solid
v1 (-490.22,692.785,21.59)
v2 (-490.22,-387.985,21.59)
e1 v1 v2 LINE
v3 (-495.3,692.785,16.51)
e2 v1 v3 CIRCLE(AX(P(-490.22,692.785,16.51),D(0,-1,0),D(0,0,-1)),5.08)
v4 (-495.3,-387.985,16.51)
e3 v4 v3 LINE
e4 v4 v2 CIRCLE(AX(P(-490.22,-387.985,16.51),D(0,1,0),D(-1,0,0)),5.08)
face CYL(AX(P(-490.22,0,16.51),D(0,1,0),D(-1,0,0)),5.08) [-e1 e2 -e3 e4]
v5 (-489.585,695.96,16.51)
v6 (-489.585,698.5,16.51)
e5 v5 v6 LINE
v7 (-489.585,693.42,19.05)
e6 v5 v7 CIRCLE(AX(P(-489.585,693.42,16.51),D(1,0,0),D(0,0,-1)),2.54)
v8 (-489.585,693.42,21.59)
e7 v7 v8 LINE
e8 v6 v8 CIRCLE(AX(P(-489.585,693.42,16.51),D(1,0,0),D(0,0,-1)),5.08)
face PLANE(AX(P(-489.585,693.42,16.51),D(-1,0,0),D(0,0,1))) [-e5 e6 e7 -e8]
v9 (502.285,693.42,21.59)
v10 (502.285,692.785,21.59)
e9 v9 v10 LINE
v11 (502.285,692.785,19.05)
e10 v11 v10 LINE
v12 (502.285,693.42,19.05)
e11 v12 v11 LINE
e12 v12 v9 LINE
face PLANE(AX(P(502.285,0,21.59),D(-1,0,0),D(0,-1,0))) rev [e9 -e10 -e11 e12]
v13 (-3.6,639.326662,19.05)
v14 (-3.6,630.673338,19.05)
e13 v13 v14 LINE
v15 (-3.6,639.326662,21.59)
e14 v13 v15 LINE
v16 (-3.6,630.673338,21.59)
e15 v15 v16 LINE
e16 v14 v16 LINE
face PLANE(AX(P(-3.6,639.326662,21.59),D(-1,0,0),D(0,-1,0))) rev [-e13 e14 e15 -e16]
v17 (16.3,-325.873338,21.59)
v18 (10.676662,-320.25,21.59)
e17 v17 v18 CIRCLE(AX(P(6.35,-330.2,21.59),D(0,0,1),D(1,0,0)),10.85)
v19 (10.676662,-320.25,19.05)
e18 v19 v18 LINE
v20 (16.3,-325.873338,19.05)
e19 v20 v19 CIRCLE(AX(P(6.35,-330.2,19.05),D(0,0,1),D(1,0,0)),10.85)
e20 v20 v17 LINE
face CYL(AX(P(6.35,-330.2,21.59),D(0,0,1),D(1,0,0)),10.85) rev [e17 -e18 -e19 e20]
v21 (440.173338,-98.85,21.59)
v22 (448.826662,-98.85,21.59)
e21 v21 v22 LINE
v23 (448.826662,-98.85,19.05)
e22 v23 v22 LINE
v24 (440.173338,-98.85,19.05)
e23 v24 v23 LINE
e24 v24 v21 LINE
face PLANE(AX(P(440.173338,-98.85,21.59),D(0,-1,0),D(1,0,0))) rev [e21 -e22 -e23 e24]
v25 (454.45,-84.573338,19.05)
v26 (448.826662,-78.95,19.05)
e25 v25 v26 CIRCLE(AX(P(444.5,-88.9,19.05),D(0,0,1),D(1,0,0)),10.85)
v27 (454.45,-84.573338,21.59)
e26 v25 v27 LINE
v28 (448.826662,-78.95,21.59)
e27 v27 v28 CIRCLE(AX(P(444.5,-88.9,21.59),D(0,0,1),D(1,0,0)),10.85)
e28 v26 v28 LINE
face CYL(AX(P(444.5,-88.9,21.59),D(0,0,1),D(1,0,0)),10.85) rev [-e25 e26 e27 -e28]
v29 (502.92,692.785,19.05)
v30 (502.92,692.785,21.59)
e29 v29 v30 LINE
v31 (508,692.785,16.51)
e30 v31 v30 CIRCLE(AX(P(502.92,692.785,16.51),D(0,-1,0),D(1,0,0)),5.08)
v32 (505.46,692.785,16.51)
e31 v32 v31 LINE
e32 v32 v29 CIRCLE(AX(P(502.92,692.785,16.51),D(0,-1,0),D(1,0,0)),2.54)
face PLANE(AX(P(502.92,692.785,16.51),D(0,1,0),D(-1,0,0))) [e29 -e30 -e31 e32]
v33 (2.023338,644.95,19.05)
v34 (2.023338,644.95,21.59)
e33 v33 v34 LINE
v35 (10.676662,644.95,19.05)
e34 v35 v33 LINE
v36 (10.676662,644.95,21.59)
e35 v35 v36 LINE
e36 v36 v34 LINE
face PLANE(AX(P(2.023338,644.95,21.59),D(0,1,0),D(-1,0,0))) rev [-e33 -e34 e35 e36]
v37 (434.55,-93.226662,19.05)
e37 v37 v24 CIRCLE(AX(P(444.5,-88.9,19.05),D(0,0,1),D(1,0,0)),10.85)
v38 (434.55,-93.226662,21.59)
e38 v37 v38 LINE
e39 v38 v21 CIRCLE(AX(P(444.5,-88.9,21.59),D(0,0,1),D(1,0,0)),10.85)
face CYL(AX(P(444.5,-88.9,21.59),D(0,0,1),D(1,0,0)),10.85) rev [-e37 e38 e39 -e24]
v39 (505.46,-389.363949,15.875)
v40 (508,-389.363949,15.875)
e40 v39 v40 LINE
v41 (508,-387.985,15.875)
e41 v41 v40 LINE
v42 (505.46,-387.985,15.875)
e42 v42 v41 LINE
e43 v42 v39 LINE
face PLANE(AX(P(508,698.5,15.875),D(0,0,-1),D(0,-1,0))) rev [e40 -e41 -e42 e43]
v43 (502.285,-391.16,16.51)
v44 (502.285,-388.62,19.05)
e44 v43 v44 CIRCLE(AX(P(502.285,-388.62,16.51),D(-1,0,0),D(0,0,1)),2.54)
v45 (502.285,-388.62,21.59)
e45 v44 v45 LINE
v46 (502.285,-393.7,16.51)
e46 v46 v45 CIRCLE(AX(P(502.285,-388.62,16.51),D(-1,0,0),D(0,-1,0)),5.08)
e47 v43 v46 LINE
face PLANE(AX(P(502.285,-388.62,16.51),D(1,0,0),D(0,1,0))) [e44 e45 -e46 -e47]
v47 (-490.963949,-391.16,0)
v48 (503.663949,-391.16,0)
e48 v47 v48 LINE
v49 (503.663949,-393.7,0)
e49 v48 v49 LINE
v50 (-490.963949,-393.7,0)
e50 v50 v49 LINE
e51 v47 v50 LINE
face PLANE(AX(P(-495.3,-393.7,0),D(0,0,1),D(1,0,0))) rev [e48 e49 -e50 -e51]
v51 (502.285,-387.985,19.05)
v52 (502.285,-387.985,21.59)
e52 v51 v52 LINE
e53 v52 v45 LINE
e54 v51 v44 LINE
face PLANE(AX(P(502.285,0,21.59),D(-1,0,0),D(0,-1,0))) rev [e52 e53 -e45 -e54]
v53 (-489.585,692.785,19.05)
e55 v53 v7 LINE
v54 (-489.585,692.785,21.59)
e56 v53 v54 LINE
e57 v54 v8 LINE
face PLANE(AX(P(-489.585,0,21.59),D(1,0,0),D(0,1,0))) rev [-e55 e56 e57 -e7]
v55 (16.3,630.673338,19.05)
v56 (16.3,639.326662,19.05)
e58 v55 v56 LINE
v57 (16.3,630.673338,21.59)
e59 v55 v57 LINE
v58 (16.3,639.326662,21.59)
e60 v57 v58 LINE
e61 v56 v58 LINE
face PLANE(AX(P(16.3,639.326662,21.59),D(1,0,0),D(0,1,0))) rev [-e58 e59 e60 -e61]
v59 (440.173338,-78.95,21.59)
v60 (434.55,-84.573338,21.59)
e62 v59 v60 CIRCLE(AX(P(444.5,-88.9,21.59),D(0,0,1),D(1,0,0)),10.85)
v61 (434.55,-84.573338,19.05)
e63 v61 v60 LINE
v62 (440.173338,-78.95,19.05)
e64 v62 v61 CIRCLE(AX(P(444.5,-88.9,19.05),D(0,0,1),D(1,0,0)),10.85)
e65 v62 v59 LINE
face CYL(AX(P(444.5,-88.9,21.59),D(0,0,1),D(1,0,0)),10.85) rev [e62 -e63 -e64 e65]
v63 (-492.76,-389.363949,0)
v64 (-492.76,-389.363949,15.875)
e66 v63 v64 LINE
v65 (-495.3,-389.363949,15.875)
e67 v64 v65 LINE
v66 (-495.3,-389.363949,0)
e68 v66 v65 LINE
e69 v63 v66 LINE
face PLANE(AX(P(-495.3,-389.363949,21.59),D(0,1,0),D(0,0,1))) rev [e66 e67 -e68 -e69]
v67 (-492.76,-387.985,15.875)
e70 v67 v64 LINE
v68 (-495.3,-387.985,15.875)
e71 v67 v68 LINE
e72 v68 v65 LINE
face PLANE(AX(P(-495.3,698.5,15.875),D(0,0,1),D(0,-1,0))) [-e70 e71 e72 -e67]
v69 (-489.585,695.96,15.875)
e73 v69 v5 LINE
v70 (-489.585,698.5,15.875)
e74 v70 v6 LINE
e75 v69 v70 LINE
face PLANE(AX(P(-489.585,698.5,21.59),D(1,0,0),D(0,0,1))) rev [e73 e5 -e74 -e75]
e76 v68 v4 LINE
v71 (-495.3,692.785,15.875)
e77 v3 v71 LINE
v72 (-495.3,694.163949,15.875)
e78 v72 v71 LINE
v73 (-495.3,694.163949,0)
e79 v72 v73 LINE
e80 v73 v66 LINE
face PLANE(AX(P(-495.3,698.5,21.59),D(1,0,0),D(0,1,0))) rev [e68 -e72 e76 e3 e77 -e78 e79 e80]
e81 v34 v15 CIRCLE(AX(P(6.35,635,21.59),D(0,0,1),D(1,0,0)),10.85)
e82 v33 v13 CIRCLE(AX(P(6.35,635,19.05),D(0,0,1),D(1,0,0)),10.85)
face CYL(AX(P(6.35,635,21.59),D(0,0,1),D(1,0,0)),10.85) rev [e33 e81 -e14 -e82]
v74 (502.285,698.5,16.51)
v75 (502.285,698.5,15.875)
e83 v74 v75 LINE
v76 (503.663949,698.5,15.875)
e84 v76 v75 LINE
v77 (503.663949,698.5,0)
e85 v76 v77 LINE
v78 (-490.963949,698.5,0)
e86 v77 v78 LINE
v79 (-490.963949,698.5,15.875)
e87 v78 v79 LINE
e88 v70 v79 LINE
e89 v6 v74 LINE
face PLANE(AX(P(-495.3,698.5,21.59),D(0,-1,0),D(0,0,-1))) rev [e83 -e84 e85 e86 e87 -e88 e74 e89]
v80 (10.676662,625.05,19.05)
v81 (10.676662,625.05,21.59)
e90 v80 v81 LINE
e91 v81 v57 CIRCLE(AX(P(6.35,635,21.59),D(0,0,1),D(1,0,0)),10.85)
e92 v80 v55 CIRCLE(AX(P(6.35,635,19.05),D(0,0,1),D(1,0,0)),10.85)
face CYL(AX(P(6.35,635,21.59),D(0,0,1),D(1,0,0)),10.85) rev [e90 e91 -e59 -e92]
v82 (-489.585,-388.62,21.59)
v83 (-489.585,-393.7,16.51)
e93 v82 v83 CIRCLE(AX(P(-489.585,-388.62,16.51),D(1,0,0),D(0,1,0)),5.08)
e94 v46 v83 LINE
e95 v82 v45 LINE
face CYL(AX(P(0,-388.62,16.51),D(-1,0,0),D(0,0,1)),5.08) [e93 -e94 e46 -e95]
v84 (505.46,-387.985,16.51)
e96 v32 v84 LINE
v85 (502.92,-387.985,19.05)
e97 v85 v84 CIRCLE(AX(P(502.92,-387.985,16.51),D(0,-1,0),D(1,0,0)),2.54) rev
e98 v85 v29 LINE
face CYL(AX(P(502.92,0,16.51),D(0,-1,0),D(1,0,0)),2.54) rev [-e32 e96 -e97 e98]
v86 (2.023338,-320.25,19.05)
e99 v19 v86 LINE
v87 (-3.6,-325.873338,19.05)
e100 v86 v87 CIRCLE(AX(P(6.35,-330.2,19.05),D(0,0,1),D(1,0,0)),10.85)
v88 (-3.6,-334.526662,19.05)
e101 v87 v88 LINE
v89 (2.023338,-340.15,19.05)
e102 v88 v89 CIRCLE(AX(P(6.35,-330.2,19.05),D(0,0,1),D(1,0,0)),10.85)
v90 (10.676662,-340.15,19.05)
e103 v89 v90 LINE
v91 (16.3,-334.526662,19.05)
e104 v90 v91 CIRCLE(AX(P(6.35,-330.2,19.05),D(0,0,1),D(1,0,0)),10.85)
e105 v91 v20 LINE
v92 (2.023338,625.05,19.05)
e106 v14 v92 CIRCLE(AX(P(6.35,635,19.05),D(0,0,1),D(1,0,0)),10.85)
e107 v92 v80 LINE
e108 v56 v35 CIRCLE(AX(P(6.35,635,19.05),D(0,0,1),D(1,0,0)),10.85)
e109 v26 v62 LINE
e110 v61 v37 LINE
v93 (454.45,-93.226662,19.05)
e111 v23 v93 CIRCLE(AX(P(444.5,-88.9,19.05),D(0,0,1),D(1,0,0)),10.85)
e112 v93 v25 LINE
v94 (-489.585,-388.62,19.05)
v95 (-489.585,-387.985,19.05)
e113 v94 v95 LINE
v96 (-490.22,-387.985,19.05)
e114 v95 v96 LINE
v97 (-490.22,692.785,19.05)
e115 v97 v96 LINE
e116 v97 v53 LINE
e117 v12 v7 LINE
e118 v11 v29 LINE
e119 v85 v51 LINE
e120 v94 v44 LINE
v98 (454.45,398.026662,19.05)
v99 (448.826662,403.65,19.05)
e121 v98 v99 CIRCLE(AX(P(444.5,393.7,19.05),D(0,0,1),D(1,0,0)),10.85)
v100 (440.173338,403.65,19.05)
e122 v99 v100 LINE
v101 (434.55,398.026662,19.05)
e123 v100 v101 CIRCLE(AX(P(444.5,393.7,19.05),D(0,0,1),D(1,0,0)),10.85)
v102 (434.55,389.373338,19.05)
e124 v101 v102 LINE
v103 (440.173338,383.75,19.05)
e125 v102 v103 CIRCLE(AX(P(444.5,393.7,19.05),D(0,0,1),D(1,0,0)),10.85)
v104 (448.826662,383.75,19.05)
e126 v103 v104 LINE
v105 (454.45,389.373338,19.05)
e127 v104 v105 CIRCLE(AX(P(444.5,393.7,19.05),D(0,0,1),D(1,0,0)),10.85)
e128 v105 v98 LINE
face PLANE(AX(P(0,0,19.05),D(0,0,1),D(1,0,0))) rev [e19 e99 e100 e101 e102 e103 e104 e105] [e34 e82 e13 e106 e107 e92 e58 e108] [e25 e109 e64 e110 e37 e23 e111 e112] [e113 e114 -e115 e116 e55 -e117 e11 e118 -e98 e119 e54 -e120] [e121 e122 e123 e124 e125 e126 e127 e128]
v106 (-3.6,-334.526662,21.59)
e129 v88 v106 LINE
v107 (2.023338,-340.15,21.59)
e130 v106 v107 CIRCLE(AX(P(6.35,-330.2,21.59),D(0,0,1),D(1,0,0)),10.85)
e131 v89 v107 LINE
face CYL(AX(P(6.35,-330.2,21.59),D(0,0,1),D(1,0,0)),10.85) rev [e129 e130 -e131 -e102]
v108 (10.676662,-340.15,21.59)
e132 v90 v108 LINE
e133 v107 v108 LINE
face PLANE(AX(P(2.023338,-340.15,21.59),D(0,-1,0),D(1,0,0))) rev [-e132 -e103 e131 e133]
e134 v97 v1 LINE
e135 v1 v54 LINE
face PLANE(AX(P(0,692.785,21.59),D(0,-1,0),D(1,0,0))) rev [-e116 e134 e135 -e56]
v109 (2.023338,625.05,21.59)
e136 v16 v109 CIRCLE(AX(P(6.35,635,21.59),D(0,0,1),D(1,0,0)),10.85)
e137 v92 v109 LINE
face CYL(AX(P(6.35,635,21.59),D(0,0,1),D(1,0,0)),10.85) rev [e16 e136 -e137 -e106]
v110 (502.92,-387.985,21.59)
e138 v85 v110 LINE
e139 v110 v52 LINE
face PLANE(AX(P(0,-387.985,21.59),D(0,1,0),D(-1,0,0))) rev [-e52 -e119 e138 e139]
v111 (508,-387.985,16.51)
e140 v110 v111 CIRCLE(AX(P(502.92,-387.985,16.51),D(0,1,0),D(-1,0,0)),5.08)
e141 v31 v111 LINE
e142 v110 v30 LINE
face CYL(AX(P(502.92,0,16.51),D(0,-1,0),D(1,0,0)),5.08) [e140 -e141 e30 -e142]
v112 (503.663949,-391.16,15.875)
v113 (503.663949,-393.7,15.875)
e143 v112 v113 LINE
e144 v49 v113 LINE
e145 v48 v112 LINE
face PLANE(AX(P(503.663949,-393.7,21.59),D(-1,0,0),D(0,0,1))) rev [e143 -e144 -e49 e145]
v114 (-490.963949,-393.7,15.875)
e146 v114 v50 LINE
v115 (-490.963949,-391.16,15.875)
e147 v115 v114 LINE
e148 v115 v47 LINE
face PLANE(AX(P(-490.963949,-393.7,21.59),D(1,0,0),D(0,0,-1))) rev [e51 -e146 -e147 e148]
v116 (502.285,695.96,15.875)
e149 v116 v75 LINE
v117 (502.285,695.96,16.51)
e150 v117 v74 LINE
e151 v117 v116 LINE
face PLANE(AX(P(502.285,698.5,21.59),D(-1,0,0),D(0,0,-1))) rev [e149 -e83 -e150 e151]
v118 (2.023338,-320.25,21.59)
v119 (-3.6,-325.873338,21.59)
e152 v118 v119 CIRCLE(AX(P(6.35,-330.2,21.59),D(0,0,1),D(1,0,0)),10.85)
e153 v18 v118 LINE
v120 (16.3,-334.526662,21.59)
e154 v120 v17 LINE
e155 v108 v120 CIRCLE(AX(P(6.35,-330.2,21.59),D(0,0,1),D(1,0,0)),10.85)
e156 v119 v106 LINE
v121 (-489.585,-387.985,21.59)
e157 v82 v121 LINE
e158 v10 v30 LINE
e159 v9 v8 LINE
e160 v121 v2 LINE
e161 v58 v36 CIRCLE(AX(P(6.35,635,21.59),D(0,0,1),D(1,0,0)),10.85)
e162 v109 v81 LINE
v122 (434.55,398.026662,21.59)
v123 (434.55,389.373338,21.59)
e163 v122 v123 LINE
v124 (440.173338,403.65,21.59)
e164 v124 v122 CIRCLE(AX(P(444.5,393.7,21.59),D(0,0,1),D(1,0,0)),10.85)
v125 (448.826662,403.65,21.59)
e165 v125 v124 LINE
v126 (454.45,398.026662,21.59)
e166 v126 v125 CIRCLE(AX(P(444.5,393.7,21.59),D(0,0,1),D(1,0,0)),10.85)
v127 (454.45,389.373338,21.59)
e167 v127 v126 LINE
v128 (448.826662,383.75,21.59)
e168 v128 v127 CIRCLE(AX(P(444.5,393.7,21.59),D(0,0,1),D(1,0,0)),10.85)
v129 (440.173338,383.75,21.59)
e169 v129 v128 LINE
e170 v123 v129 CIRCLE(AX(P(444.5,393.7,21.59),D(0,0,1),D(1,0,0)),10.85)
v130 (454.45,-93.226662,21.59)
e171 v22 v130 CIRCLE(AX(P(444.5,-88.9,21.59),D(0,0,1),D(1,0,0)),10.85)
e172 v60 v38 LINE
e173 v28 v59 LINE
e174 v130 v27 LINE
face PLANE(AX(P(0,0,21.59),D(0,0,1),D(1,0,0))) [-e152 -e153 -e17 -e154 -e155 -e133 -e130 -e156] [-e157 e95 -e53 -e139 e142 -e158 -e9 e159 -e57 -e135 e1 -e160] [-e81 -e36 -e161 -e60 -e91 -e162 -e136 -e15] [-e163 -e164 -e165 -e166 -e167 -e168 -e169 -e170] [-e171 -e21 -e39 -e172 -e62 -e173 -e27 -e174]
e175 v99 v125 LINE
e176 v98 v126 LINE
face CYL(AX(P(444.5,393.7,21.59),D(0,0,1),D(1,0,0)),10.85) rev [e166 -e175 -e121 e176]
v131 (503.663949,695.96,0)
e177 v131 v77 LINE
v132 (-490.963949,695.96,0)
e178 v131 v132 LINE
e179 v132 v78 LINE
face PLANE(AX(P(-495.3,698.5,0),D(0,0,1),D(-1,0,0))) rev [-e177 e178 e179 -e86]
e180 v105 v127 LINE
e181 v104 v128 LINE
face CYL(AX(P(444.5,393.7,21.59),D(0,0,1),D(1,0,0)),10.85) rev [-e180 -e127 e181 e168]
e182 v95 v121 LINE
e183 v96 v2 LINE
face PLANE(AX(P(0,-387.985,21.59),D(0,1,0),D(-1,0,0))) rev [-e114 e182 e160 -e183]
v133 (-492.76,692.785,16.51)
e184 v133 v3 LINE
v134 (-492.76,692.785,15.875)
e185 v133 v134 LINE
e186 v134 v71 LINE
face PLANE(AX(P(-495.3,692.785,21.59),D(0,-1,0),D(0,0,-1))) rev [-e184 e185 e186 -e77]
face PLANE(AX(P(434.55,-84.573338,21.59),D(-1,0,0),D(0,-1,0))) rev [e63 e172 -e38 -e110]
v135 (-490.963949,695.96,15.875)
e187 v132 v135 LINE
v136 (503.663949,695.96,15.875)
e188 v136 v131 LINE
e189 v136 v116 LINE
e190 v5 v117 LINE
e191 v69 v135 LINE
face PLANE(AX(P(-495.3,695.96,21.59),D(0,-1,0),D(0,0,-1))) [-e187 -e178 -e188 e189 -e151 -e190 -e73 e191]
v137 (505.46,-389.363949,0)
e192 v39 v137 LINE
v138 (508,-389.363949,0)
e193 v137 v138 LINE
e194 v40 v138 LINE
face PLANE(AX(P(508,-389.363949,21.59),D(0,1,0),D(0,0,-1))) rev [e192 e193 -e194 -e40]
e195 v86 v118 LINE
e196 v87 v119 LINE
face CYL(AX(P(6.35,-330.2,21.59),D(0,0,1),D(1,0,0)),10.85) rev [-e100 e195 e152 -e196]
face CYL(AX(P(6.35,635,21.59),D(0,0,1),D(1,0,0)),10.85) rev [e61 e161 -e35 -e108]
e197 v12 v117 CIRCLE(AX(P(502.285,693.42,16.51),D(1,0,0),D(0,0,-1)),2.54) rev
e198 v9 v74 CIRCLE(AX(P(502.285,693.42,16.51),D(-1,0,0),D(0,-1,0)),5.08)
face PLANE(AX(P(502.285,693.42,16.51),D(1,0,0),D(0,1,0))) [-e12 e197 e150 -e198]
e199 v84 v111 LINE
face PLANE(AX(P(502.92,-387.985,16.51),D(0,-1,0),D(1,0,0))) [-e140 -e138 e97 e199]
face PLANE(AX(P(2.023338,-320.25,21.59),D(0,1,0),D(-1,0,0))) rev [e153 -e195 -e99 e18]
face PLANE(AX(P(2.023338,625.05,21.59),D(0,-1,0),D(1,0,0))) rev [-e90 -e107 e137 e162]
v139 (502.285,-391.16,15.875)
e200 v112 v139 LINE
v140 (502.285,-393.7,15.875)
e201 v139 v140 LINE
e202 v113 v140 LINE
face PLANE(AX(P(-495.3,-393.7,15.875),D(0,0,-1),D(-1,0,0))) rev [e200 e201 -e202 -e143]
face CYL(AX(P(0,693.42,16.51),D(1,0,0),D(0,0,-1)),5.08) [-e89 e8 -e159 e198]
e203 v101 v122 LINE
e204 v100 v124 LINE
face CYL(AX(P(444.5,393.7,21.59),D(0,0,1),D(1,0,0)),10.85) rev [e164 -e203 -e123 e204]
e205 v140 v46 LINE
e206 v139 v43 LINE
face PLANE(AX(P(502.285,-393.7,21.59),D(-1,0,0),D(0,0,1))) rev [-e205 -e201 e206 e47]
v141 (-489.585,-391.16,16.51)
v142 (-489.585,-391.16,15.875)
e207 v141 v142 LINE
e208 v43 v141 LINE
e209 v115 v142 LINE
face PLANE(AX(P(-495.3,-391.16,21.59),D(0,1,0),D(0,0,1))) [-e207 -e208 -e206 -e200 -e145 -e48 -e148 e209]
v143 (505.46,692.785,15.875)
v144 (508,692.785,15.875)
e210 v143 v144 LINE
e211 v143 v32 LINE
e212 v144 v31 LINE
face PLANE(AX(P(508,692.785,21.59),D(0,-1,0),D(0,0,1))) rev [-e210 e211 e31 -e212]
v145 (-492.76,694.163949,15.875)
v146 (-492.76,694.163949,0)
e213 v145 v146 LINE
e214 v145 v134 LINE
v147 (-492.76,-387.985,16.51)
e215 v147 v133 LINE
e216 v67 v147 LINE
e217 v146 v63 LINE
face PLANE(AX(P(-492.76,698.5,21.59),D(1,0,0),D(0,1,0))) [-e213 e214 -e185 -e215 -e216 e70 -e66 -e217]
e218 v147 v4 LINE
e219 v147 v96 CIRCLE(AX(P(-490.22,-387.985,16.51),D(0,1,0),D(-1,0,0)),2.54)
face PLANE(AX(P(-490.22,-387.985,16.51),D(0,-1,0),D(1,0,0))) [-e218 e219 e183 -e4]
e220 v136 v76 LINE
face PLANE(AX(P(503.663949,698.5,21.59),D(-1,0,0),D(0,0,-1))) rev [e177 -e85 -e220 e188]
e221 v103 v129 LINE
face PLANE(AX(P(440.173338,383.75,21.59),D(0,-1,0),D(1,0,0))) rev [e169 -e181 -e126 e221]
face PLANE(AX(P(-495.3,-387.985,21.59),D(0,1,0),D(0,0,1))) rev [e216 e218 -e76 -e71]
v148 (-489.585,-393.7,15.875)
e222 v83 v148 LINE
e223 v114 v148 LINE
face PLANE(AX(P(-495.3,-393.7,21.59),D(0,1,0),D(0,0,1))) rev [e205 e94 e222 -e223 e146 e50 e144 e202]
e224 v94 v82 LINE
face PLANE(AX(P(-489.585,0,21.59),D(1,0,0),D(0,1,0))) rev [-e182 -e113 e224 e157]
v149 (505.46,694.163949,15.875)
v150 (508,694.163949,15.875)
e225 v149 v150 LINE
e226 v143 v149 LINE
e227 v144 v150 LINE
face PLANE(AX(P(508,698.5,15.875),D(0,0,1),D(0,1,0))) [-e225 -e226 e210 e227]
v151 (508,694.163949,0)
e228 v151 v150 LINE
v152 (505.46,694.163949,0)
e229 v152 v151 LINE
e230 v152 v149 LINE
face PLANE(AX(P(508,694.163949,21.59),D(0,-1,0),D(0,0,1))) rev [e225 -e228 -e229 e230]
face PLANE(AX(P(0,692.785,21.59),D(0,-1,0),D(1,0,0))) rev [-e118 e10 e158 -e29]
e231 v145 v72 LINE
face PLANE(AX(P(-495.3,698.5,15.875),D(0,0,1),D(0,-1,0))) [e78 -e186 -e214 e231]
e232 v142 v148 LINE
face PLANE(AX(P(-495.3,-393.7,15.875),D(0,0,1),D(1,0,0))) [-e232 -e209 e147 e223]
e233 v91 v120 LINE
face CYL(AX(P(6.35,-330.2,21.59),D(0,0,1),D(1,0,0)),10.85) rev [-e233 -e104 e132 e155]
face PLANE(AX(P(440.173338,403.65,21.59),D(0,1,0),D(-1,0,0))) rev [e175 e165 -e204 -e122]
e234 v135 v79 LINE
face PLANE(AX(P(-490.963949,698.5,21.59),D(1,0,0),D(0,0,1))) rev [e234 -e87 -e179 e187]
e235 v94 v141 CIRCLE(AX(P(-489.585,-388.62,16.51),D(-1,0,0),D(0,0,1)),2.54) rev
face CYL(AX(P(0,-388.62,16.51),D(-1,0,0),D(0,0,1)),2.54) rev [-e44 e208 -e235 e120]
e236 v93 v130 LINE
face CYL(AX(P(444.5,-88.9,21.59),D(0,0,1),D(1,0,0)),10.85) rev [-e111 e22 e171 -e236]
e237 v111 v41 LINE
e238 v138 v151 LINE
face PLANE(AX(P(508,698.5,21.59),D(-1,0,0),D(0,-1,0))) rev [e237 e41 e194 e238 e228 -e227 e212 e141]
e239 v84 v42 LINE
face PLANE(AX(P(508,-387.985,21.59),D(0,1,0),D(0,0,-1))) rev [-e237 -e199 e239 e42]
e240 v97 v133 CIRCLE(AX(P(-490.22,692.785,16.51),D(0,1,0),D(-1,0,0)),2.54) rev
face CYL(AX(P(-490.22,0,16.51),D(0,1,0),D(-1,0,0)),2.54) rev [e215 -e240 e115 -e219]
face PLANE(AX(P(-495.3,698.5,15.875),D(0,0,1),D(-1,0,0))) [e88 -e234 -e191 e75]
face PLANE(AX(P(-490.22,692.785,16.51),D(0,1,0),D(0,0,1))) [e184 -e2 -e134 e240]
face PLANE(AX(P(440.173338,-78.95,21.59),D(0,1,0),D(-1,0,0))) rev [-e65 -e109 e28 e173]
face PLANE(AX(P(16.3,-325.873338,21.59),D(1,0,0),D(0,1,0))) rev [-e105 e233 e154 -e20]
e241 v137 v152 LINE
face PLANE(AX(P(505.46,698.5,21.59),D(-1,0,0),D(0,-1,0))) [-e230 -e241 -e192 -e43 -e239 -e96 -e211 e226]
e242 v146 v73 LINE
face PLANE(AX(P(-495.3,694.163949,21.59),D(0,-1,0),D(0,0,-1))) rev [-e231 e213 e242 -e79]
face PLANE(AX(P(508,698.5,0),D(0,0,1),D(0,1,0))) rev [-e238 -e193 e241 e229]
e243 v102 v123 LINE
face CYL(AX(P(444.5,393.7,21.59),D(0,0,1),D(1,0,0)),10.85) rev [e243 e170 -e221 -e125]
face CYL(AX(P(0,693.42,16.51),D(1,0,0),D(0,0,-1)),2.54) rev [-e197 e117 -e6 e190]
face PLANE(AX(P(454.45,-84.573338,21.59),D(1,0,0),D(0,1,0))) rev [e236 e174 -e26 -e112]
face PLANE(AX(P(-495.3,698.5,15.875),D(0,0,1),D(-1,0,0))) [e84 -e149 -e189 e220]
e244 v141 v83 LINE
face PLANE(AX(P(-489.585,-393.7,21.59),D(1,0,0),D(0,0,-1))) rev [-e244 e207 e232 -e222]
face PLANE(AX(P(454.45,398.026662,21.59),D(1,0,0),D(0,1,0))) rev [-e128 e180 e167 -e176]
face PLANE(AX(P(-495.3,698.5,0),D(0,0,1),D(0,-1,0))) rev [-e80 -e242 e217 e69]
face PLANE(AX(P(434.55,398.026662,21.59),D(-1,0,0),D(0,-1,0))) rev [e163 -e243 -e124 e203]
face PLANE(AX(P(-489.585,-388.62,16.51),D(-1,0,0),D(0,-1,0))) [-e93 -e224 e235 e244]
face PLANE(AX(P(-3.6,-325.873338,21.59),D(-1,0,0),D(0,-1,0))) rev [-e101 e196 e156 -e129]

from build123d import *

# Parameters (mm, degrees)
SKETCH1_W               = 1003.3
SKETCH1_H               = 1092.2
SKETCH1_W_2             = 998.22
SKETCH1_H_2             = 1087.12
BOSS_EXTRUDE1_DEPTH     = 21.59
SKETCH3_W               = 1003.3
SKETCH3_H               = 1092.2
BOSS_EXTRUDE2_DEPTH     = 2.54
CUT_EXTRUDE1_REACH      = 865.963
CONVERT_SOLID1_START    = -495.3
CONVERT_SOLID1_DEPTH    = 1003.3
CONVERT_SOLID1_2_DEPTH  = 4.336051224
CONVERT_SOLID1_START_2  = 503.663948776
CONVERT_SOLID1_3_DEPTH  = 4.336051224
CONVERT_SOLID1_START_3  = -490.963948776
CONVERT_SOLID1_4_DEPTH  = 1.378948776
CONVERT_SOLID1_START_4  = 502.285
CONVERT_SOLID1_5_DEPTH  = 1.378948776
CONVERT_SOLID1_START_5  = -489.585
CONVERT_SOLID1_6_DEPTH  = 991.87
CONVERT_SOLID1_START_6  = -391.16
CONVERT_SOLID1_7_DEPTH  = 1087.12
CONVERT_SOLID1_8_DEPTH  = 1.796051224
CONVERT_SOLID1_START_7  = 694.163948776
CONVERT_SOLID1_9_DEPTH  = 1.796051224
CONVERT_SOLID1_START_8  = -389.363948776
CONVERT_SOLID1_10_DEPTH = 1.378948776
CONVERT_SOLID1_START_9  = 692.785
CONVERT_SOLID1_11_DEPTH = 1.378948776
CONVERT_SOLID1_START_10 = -387.985
CONVERT_SOLID1_12_DEPTH = 1080.77


with BuildPart() as part:
    # Sketch1 → Boss-Extrude1 (new body)
    with BuildSketch(Plane.XY):
        with Locations((6.35, 152.4)):
            Rectangle(SKETCH1_W, SKETCH1_H)
        with Locations((6.35, 152.4)):
            Rectangle(SKETCH1_W_2, SKETCH1_H_2, mode=Mode.SUBTRACT)
    extrude(amount=BOSS_EXTRUDE1_DEPTH)

    # Sketch3 → Boss-Extrude2 (add)
    with BuildSketch(Plane.XY.offset(21.59)):
        with Locations((6.35, 152.4)):
            Rectangle(SKETCH3_W, SKETCH3_H)
    extrude(amount=-BOSS_EXTRUDE2_DEPTH)

    # Sketch4 → Cut-Extrude1 (cut, up to next)
    with BuildSketch(Plane.XY.offset(21.59), mode=Mode.PRIVATE) as cut_extrude1_sk1:
        with BuildLine():
            Line((440.173338469, 403.65), (448.826661531, 403.65))
            ThreePointArc((448.826661531, 403.65), (452.172108576, 401.372108576), (454.45, 398.026661531))
            Line((454.45, 398.026661531), (454.45, 389.373338469))
            ThreePointArc((454.45, 389.373338469), (452.172108576, 386.027891424), (448.826661531, 383.75))
            Line((448.826661531, 383.75), (440.173338469, 383.75))
            ThreePointArc((440.173338469, 383.75), (436.827891424, 386.027891424), (434.55, 389.373338469))
            Line((434.55, 389.373338469), (434.55, 398.026661531))
            ThreePointArc((434.55, 398.026661531), (436.827891424, 401.372108576), (440.173338469, 403.65))
        make_face()
    cut_extrude1_tool1 = extrude(cut_extrude1_sk1.sketch, amount=-CUT_EXTRUDE1_REACH, mode=Mode.PRIVATE) & part.part
    # Sketch4 → Cut-Extrude1 (cut, up to next)
    with BuildSketch(Plane.XY.offset(21.59), mode=Mode.PRIVATE) as cut_extrude1_sk2:
        with BuildLine():
            Line((440.173338469, -78.95), (448.826661531, -78.95))
            ThreePointArc((448.826661531, -78.95), (452.172108576, -81.227891424), (454.45, -84.573338469))
            Line((454.45, -84.573338469), (454.45, -93.226661531))
            ThreePointArc((454.45, -93.226661531), (452.172108576, -96.572108576), (448.826661531, -98.85))
            Line((448.826661531, -98.85), (440.173338469, -98.85))
            ThreePointArc((440.173338469, -98.85), (436.827891424, -96.572108576), (434.55, -93.226661531))
            Line((434.55, -93.226661531), (434.55, -84.573338469))
            ThreePointArc((434.55, -84.573338469), (436.827891424, -81.227891424), (440.173338469, -78.95))
        make_face()
    cut_extrude1_tool2 = extrude(cut_extrude1_sk2.sketch, amount=-CUT_EXTRUDE1_REACH, mode=Mode.PRIVATE) & part.part
    # Sketch4 → Cut-Extrude1 (cut, up to next)
    with BuildSketch(Plane.XY.offset(21.59), mode=Mode.PRIVATE) as cut_extrude1_sk3:
        with BuildLine():
            Line((2.023338469, 644.95), (10.676661531, 644.95))
            ThreePointArc((10.676661531, 644.95), (14.022108576, 642.672108576), (16.3, 639.326661531))
            Line((16.3, 639.326661531), (16.3, 630.673338469))
            ThreePointArc((16.3, 630.673338469), (14.022108576, 627.327891424), (10.676661531, 625.05))
            Line((10.676661531, 625.05), (2.023338469, 625.05))
            ThreePointArc((2.023338469, 625.05), (-1.322108576, 627.327891424), (-3.6, 630.673338469))
            Line((-3.6, 630.673338469), (-3.6, 639.326661531))
            ThreePointArc((-3.6, 639.326661531), (-1.322108576, 642.672108576), (2.023338469, 644.95))
        make_face()
    cut_extrude1_tool3 = extrude(cut_extrude1_sk3.sketch, amount=-CUT_EXTRUDE1_REACH, mode=Mode.PRIVATE) & part.part
    # Sketch4 → Cut-Extrude1 (cut, up to next)
    with BuildSketch(Plane.XY.offset(21.59), mode=Mode.PRIVATE) as cut_extrude1_sk4:
        with BuildLine():
            Line((2.023338469, -320.25), (10.676661531, -320.25))
            ThreePointArc((10.676661531, -320.25), (14.022108576, -322.527891424), (16.3, -325.873338469))
            Line((16.3, -325.873338469), (16.3, -334.526661531))
            ThreePointArc((16.3, -334.526661531), (14.022108576, -337.872108576), (10.676661531, -340.15))
            Line((10.676661531, -340.15), (2.023338469, -340.15))
            ThreePointArc((2.023338469, -340.15), (-1.322108576, -337.872108576), (-3.6, -334.526661531))
            Line((-3.6, -334.526661531), (-3.6, -325.873338469))
            ThreePointArc((-3.6, -325.873338469), (-1.322108576, -322.527891424), (2.023338469, -320.25))
        make_face()
    cut_extrude1_tool4 = extrude(cut_extrude1_sk4.sketch, amount=-CUT_EXTRUDE1_REACH, mode=Mode.PRIVATE) & part.part
    add(cut_extrude1_tool1.solids().sort_by_distance((444.5, 393.7, 21.59))[0], mode=Mode.SUBTRACT)
    add(cut_extrude1_tool2.solids().sort_by_distance((444.5, -88.9, 21.59))[0], mode=Mode.SUBTRACT)
    add(cut_extrude1_tool3.solids().sort_by_distance((6.35, 635, 21.59))[0], mode=Mode.SUBTRACT)
    add(cut_extrude1_tool4.solids().sort_by_distance((6.35, -330.2, 21.59))[0], mode=Mode.SUBTRACT)

    # Convert-Solid1: read off the stored shape, not the designer's step
    # Convert-Solid1 outline → Convert-Solid1 (cut)
    with BuildSketch(Plane.YZ.offset(CONVERT_SOLID1_START)):
        with BuildLine():
            ThreePointArc((-393.7, 16.51), (-392.212102448, 20.102102448), (-388.62, 21.59))
            Line((-388.62, 21.59), (-393.7, 21.59))
            Line((-393.7, 21.59), (-393.7, 16.51))
        make_face()
        with BuildLine():
            Line((698.5, 21.59), (693.42, 21.59))
            ThreePointArc((693.42, 21.59), (697.012102448, 20.102102448), (698.5, 16.51))
            Line((698.5, 16.51), (698.5, 21.59))
        make_face()
    extrude(amount=CONVERT_SOLID1_DEPTH, mode=Mode.SUBTRACT)

    # Convert-Solid1 2 outline → Convert-Solid1 2 (cut)
    with BuildSketch(Plane.YZ.offset(CONVERT_SOLID1_START)):
        with BuildLine():
            Line((-388.62, 19.05), (-387.985, 19.05))
            Line((-387.985, 19.05), (-387.985, 21.59))
            Line((-387.985, 21.59), (-388.62, 21.59))
            ThreePointArc((-388.62, 21.59), (-392.212102448, 20.102102448), (-393.7, 16.51))
            Line((-393.7, 16.51), (-393.7, 0))
            Line((-393.7, 0), (-391.16, 0))
            Line((-391.16, 0), (-391.16, 16.51))
            ThreePointArc((-391.16, 16.51), (-390.416051224, 18.306051224), (-388.62, 19.05))
        make_face()
        with BuildLine():
            Line((692.785, 21.59), (692.785, 19.05))
            Line((692.785, 19.05), (693.42, 19.05))
            ThreePointArc((693.42, 19.05), (695.216051224, 18.306051224), (695.96, 16.51))
            Line((695.96, 16.51), (695.96, 0))
            Line((695.96, 0), (698.5, 0))
            Line((698.5, 0), (698.5, 16.51))
            ThreePointArc((698.5, 16.51), (697.012102448, 20.102102448), (693.42, 21.59))
            Line((693.42, 21.59), (692.785, 21.59))
        make_face()
    extrude(amount=CONVERT_SOLID1_2_DEPTH, mode=Mode.SUBTRACT)

    # Convert-Solid1 3 outline → Convert-Solid1 3 (cut)
    with BuildSketch(Plane.YZ.offset(CONVERT_SOLID1_START_2)):
        with BuildLine():
            Line((-388.62, 19.05), (-387.985, 19.05))
            Line((-387.985, 19.05), (-387.985, 21.59))
            Line((-387.985, 21.59), (-388.62, 21.59))
            ThreePointArc((-388.62, 21.59), (-392.212102448, 20.102102448), (-393.7, 16.51))
            Line((-393.7, 16.51), (-393.7, 0))
            Line((-393.7, 0), (-391.16, 0))
            Line((-391.16, 0), (-391.16, 16.51))
            ThreePointArc((-391.16, 16.51), (-390.416051224, 18.306051224), (-388.62, 19.05))
        make_face()
        with BuildLine():
            Line((692.785, 21.59), (692.785, 19.05))
            Line((692.785, 19.05), (693.42, 19.05))
            ThreePointArc((693.42, 19.05), (695.216051224, 18.306051224), (695.96, 16.51))
            Line((695.96, 16.51), (695.96, 0))
            Line((695.96, 0), (698.5, 0))
            Line((698.5, 0), (698.5, 16.51))
            ThreePointArc((698.5, 16.51), (697.012102448, 20.102102448), (693.42, 21.59))
            Line((693.42, 21.59), (692.785, 21.59))
        make_face()
    extrude(amount=CONVERT_SOLID1_3_DEPTH, mode=Mode.SUBTRACT)

    # Convert-Solid1 4 outline → Convert-Solid1 4 (cut)
    with BuildSketch(Plane.YZ.offset(CONVERT_SOLID1_START_3)):
        with BuildLine():
            Line((-391.16, 19.05), (-387.985, 19.05))
            Line((-387.985, 19.05), (-387.985, 21.59))
            Line((-387.985, 21.59), (-388.62, 21.59))
            ThreePointArc((-388.62, 21.59), (-392.212102448, 20.102102448), (-393.7, 16.51))
            Line((-393.7, 16.51), (-393.7, 15.875))
            Line((-393.7, 15.875), (-391.16, 15.875))
            Line((-391.16, 15.875), (-391.16, 19.05))
        make_face()
        with BuildLine():
            Line((692.785, 21.59), (692.785, 19.05))
            Line((692.785, 19.05), (695.96, 19.05))
            Line((695.96, 19.05), (695.96, 15.875))
            Line((695.96, 15.875), (698.5, 15.875))
            Line((698.5, 15.875), (698.5, 16.51))
            ThreePointArc((698.5, 16.51), (697.012102448, 20.102102448), (693.42, 21.59))
            Line((693.42, 21.59), (692.785, 21.59))
        make_face()
    extrude(amount=CONVERT_SOLID1_4_DEPTH, mode=Mode.SUBTRACT)

    # Convert-Solid1 5 outline → Convert-Solid1 5 (cut)
    with BuildSketch(Plane.YZ.offset(CONVERT_SOLID1_START_4)):
        with BuildLine():
            Line((-391.16, 19.05), (-387.985, 19.05))
            Line((-387.985, 19.05), (-387.985, 21.59))
            Line((-387.985, 21.59), (-388.62, 21.59))
            ThreePointArc((-388.62, 21.59), (-392.212102448, 20.102102448), (-393.7, 16.51))
            Line((-393.7, 16.51), (-393.7, 15.875))
            Line((-393.7, 15.875), (-391.16, 15.875))
            Line((-391.16, 15.875), (-391.16, 19.05))
        make_face()
        with BuildLine():
            Line((692.785, 21.59), (692.785, 19.05))
            Line((692.785, 19.05), (695.96, 19.05))
            Line((695.96, 19.05), (695.96, 15.875))
            Line((695.96, 15.875), (698.5, 15.875))
            Line((698.5, 15.875), (698.5, 16.51))
            ThreePointArc((698.5, 16.51), (697.012102448, 20.102102448), (693.42, 21.59))
            Line((693.42, 21.59), (692.785, 21.59))
        make_face()
    extrude(amount=CONVERT_SOLID1_5_DEPTH, mode=Mode.SUBTRACT)

    # Convert-Solid1 6 outline → Convert-Solid1 6 (add)
    with BuildSketch(Plane.YZ.offset(CONVERT_SOLID1_START_5)):
        with BuildLine():
            ThreePointArc((-391.16, 16.51), (-390.416051224, 18.306051224), (-388.62, 19.05))
            Line((-388.62, 19.05), (-391.16, 19.05))
            Line((-391.16, 19.05), (-391.16, 16.51))
        make_face()
        with BuildLine():
            Line((695.96, 19.05), (693.42, 19.05))
            ThreePointArc((693.42, 19.05), (695.216051224, 18.306051224), (695.96, 16.51))
            Line((695.96, 16.51), (695.96, 19.05))
        make_face()
    extrude(amount=CONVERT_SOLID1_6_DEPTH)

    # Convert-Solid1 7 outline → Convert-Solid1 7 (cut)
    with BuildSketch(Plane(origin=(0, 0, 0), x_dir=(1, 0, 0), z_dir=(0, 1, 0)).offset(CONVERT_SOLID1_START_6)):
        with BuildLine():
            ThreePointArc((508, -16.51), (506.512102448, -20.102102448), (502.92, -21.59))
            Line((502.92, -21.59), (508, -21.59))
            Line((508, -21.59), (508, -16.51))
        make_face()
        with BuildLine():
            Line((-495.3, -21.59), (-490.22, -21.59))
            ThreePointArc((-490.22, -21.59), (-493.812102448, -20.102102448), (-495.3, -16.51))
            Line((-495.3, -16.51), (-495.3, -21.59))
        make_face()
    extrude(amount=CONVERT_SOLID1_7_DEPTH, mode=Mode.SUBTRACT)

    # Convert-Solid1 8 outline → Convert-Solid1 8 (cut)
    with BuildSketch(Plane(origin=(0, 0, 0), x_dir=(1, 0, 0), z_dir=(0, 1, 0)).offset(CONVERT_SOLID1_START_6)):
        with BuildLine():
            Line((508, -16.51), (508, 0))
            Line((508, 0), (505.46, 0))
            Line((505.46, 0), (505.46, -19.05))
            Line((505.46, -19.05), (507.319409051, -19.05))
            ThreePointArc((507.319409051, -19.05), (507.826903197, -17.824800749), (508, -16.51))
        make_face()
        with BuildLine():
            Line((-492.76, -19.05), (-492.76, 0))
            Line((-492.76, 0), (-495.3, 0))
            Line((-495.3, 0), (-495.3, -16.51))
            ThreePointArc((-495.3, -16.51), (-495.126903197, -17.824800749), (-494.619409051, -19.05))
            Line((-494.619409051, -19.05), (-492.76, -19.05))
        make_face()
    extrude(amount=CONVERT_SOLID1_8_DEPTH, mode=Mode.SUBTRACT)

    # Convert-Solid1 9 outline → Convert-Solid1 9 (cut)
    with BuildSketch(Plane(origin=(0, 0, 0), x_dir=(1, 0, 0), z_dir=(0, 1, 0)).offset(CONVERT_SOLID1_START_7)):
        with BuildLine():
            Line((508, -16.51), (508, 0))
            Line((508, 0), (505.46, 0))
            Line((505.46, 0), (505.46, -19.05))
            Line((505.46, -19.05), (507.319409051, -19.05))
            ThreePointArc((507.319409051, -19.05), (507.826903197, -17.824800749), (508, -16.51))
        make_face()
        with BuildLine():
            Line((-492.76, -19.05), (-492.76, 0))
            Line((-492.76, 0), (-495.3, 0))
            Line((-495.3, 0), (-495.3, -16.51))
            ThreePointArc((-495.3, -16.51), (-495.126903197, -17.824800749), (-494.619409051, -19.05))
            Line((-494.619409051, -19.05), (-492.76, -19.05))
        make_face()
    extrude(amount=CONVERT_SOLID1_9_DEPTH, mode=Mode.SUBTRACT)

    # Convert-Solid1 10 outline → Convert-Solid1 10 (cut)
    with BuildSketch(Plane(origin=(0, 0, 0), x_dir=(1, 0, 0), z_dir=(0, 1, 0)).offset(CONVERT_SOLID1_START_8)):
        with BuildLine():
            Line((508, -16.51), (508, -15.875))
            Line((508, -15.875), (505.46, -15.875))
            Line((505.46, -15.875), (505.46, -19.05))
            Line((505.46, -19.05), (507.319409051, -19.05))
            ThreePointArc((507.319409051, -19.05), (507.826903197, -17.824800749), (508, -16.51))
        make_face()
        with BuildLine():
            Line((-492.76, -19.05), (-492.76, -15.875))
            Line((-492.76, -15.875), (-495.3, -15.875))
            Line((-495.3, -15.875), (-495.3, -16.51))
            ThreePointArc((-495.3, -16.51), (-495.126903197, -17.824800749), (-494.619409051, -19.05))
            Line((-494.619409051, -19.05), (-492.76, -19.05))
        make_face()
    extrude(amount=CONVERT_SOLID1_10_DEPTH, mode=Mode.SUBTRACT)

    # Convert-Solid1 11 outline → Convert-Solid1 11 (cut)
    with BuildSketch(Plane(origin=(0, 0, 0), x_dir=(1, 0, 0), z_dir=(0, 1, 0)).offset(CONVERT_SOLID1_START_9)):
        with BuildLine():
            Line((508, -16.51), (508, -15.875))
            Line((508, -15.875), (505.46, -15.875))
            Line((505.46, -15.875), (505.46, -19.05))
            Line((505.46, -19.05), (507.319409051, -19.05))
            ThreePointArc((507.319409051, -19.05), (507.826903197, -17.824800749), (508, -16.51))
        make_face()
        with BuildLine():
            Line((-492.76, -19.05), (-492.76, -15.875))
            Line((-492.76, -15.875), (-495.3, -15.875))
            Line((-495.3, -15.875), (-495.3, -16.51))
            ThreePointArc((-495.3, -16.51), (-495.126903197, -17.824800749), (-494.619409051, -19.05))
            Line((-494.619409051, -19.05), (-492.76, -19.05))
        make_face()
    extrude(amount=CONVERT_SOLID1_11_DEPTH, mode=Mode.SUBTRACT)

    # Convert-Solid1 12 outline → Convert-Solid1 12 (add)
    with BuildSketch(Plane(origin=(0, 0, 0), x_dir=(1, 0, 0), z_dir=(0, 1, 0)).offset(CONVERT_SOLID1_START_10)):
        with BuildLine():
            Line((505.46, -19.05), (505.46, -16.51))
            ThreePointArc((505.46, -16.51), (504.716051224, -18.306051224), (502.92, -19.05))
            Line((502.92, -19.05), (505.46, -19.05))
        make_face()
        with BuildLine():
            Line((-492.76, -19.05), (-490.22, -19.05))
            ThreePointArc((-490.22, -19.05), (-492.016051224, -18.306051224), (-492.76, -16.51))
            Line((-492.76, -16.51), (-492.76, -19.05))
        make_face()
    extrude(amount=CONVERT_SOLID1_12_DEPTH)


solid = part.part
